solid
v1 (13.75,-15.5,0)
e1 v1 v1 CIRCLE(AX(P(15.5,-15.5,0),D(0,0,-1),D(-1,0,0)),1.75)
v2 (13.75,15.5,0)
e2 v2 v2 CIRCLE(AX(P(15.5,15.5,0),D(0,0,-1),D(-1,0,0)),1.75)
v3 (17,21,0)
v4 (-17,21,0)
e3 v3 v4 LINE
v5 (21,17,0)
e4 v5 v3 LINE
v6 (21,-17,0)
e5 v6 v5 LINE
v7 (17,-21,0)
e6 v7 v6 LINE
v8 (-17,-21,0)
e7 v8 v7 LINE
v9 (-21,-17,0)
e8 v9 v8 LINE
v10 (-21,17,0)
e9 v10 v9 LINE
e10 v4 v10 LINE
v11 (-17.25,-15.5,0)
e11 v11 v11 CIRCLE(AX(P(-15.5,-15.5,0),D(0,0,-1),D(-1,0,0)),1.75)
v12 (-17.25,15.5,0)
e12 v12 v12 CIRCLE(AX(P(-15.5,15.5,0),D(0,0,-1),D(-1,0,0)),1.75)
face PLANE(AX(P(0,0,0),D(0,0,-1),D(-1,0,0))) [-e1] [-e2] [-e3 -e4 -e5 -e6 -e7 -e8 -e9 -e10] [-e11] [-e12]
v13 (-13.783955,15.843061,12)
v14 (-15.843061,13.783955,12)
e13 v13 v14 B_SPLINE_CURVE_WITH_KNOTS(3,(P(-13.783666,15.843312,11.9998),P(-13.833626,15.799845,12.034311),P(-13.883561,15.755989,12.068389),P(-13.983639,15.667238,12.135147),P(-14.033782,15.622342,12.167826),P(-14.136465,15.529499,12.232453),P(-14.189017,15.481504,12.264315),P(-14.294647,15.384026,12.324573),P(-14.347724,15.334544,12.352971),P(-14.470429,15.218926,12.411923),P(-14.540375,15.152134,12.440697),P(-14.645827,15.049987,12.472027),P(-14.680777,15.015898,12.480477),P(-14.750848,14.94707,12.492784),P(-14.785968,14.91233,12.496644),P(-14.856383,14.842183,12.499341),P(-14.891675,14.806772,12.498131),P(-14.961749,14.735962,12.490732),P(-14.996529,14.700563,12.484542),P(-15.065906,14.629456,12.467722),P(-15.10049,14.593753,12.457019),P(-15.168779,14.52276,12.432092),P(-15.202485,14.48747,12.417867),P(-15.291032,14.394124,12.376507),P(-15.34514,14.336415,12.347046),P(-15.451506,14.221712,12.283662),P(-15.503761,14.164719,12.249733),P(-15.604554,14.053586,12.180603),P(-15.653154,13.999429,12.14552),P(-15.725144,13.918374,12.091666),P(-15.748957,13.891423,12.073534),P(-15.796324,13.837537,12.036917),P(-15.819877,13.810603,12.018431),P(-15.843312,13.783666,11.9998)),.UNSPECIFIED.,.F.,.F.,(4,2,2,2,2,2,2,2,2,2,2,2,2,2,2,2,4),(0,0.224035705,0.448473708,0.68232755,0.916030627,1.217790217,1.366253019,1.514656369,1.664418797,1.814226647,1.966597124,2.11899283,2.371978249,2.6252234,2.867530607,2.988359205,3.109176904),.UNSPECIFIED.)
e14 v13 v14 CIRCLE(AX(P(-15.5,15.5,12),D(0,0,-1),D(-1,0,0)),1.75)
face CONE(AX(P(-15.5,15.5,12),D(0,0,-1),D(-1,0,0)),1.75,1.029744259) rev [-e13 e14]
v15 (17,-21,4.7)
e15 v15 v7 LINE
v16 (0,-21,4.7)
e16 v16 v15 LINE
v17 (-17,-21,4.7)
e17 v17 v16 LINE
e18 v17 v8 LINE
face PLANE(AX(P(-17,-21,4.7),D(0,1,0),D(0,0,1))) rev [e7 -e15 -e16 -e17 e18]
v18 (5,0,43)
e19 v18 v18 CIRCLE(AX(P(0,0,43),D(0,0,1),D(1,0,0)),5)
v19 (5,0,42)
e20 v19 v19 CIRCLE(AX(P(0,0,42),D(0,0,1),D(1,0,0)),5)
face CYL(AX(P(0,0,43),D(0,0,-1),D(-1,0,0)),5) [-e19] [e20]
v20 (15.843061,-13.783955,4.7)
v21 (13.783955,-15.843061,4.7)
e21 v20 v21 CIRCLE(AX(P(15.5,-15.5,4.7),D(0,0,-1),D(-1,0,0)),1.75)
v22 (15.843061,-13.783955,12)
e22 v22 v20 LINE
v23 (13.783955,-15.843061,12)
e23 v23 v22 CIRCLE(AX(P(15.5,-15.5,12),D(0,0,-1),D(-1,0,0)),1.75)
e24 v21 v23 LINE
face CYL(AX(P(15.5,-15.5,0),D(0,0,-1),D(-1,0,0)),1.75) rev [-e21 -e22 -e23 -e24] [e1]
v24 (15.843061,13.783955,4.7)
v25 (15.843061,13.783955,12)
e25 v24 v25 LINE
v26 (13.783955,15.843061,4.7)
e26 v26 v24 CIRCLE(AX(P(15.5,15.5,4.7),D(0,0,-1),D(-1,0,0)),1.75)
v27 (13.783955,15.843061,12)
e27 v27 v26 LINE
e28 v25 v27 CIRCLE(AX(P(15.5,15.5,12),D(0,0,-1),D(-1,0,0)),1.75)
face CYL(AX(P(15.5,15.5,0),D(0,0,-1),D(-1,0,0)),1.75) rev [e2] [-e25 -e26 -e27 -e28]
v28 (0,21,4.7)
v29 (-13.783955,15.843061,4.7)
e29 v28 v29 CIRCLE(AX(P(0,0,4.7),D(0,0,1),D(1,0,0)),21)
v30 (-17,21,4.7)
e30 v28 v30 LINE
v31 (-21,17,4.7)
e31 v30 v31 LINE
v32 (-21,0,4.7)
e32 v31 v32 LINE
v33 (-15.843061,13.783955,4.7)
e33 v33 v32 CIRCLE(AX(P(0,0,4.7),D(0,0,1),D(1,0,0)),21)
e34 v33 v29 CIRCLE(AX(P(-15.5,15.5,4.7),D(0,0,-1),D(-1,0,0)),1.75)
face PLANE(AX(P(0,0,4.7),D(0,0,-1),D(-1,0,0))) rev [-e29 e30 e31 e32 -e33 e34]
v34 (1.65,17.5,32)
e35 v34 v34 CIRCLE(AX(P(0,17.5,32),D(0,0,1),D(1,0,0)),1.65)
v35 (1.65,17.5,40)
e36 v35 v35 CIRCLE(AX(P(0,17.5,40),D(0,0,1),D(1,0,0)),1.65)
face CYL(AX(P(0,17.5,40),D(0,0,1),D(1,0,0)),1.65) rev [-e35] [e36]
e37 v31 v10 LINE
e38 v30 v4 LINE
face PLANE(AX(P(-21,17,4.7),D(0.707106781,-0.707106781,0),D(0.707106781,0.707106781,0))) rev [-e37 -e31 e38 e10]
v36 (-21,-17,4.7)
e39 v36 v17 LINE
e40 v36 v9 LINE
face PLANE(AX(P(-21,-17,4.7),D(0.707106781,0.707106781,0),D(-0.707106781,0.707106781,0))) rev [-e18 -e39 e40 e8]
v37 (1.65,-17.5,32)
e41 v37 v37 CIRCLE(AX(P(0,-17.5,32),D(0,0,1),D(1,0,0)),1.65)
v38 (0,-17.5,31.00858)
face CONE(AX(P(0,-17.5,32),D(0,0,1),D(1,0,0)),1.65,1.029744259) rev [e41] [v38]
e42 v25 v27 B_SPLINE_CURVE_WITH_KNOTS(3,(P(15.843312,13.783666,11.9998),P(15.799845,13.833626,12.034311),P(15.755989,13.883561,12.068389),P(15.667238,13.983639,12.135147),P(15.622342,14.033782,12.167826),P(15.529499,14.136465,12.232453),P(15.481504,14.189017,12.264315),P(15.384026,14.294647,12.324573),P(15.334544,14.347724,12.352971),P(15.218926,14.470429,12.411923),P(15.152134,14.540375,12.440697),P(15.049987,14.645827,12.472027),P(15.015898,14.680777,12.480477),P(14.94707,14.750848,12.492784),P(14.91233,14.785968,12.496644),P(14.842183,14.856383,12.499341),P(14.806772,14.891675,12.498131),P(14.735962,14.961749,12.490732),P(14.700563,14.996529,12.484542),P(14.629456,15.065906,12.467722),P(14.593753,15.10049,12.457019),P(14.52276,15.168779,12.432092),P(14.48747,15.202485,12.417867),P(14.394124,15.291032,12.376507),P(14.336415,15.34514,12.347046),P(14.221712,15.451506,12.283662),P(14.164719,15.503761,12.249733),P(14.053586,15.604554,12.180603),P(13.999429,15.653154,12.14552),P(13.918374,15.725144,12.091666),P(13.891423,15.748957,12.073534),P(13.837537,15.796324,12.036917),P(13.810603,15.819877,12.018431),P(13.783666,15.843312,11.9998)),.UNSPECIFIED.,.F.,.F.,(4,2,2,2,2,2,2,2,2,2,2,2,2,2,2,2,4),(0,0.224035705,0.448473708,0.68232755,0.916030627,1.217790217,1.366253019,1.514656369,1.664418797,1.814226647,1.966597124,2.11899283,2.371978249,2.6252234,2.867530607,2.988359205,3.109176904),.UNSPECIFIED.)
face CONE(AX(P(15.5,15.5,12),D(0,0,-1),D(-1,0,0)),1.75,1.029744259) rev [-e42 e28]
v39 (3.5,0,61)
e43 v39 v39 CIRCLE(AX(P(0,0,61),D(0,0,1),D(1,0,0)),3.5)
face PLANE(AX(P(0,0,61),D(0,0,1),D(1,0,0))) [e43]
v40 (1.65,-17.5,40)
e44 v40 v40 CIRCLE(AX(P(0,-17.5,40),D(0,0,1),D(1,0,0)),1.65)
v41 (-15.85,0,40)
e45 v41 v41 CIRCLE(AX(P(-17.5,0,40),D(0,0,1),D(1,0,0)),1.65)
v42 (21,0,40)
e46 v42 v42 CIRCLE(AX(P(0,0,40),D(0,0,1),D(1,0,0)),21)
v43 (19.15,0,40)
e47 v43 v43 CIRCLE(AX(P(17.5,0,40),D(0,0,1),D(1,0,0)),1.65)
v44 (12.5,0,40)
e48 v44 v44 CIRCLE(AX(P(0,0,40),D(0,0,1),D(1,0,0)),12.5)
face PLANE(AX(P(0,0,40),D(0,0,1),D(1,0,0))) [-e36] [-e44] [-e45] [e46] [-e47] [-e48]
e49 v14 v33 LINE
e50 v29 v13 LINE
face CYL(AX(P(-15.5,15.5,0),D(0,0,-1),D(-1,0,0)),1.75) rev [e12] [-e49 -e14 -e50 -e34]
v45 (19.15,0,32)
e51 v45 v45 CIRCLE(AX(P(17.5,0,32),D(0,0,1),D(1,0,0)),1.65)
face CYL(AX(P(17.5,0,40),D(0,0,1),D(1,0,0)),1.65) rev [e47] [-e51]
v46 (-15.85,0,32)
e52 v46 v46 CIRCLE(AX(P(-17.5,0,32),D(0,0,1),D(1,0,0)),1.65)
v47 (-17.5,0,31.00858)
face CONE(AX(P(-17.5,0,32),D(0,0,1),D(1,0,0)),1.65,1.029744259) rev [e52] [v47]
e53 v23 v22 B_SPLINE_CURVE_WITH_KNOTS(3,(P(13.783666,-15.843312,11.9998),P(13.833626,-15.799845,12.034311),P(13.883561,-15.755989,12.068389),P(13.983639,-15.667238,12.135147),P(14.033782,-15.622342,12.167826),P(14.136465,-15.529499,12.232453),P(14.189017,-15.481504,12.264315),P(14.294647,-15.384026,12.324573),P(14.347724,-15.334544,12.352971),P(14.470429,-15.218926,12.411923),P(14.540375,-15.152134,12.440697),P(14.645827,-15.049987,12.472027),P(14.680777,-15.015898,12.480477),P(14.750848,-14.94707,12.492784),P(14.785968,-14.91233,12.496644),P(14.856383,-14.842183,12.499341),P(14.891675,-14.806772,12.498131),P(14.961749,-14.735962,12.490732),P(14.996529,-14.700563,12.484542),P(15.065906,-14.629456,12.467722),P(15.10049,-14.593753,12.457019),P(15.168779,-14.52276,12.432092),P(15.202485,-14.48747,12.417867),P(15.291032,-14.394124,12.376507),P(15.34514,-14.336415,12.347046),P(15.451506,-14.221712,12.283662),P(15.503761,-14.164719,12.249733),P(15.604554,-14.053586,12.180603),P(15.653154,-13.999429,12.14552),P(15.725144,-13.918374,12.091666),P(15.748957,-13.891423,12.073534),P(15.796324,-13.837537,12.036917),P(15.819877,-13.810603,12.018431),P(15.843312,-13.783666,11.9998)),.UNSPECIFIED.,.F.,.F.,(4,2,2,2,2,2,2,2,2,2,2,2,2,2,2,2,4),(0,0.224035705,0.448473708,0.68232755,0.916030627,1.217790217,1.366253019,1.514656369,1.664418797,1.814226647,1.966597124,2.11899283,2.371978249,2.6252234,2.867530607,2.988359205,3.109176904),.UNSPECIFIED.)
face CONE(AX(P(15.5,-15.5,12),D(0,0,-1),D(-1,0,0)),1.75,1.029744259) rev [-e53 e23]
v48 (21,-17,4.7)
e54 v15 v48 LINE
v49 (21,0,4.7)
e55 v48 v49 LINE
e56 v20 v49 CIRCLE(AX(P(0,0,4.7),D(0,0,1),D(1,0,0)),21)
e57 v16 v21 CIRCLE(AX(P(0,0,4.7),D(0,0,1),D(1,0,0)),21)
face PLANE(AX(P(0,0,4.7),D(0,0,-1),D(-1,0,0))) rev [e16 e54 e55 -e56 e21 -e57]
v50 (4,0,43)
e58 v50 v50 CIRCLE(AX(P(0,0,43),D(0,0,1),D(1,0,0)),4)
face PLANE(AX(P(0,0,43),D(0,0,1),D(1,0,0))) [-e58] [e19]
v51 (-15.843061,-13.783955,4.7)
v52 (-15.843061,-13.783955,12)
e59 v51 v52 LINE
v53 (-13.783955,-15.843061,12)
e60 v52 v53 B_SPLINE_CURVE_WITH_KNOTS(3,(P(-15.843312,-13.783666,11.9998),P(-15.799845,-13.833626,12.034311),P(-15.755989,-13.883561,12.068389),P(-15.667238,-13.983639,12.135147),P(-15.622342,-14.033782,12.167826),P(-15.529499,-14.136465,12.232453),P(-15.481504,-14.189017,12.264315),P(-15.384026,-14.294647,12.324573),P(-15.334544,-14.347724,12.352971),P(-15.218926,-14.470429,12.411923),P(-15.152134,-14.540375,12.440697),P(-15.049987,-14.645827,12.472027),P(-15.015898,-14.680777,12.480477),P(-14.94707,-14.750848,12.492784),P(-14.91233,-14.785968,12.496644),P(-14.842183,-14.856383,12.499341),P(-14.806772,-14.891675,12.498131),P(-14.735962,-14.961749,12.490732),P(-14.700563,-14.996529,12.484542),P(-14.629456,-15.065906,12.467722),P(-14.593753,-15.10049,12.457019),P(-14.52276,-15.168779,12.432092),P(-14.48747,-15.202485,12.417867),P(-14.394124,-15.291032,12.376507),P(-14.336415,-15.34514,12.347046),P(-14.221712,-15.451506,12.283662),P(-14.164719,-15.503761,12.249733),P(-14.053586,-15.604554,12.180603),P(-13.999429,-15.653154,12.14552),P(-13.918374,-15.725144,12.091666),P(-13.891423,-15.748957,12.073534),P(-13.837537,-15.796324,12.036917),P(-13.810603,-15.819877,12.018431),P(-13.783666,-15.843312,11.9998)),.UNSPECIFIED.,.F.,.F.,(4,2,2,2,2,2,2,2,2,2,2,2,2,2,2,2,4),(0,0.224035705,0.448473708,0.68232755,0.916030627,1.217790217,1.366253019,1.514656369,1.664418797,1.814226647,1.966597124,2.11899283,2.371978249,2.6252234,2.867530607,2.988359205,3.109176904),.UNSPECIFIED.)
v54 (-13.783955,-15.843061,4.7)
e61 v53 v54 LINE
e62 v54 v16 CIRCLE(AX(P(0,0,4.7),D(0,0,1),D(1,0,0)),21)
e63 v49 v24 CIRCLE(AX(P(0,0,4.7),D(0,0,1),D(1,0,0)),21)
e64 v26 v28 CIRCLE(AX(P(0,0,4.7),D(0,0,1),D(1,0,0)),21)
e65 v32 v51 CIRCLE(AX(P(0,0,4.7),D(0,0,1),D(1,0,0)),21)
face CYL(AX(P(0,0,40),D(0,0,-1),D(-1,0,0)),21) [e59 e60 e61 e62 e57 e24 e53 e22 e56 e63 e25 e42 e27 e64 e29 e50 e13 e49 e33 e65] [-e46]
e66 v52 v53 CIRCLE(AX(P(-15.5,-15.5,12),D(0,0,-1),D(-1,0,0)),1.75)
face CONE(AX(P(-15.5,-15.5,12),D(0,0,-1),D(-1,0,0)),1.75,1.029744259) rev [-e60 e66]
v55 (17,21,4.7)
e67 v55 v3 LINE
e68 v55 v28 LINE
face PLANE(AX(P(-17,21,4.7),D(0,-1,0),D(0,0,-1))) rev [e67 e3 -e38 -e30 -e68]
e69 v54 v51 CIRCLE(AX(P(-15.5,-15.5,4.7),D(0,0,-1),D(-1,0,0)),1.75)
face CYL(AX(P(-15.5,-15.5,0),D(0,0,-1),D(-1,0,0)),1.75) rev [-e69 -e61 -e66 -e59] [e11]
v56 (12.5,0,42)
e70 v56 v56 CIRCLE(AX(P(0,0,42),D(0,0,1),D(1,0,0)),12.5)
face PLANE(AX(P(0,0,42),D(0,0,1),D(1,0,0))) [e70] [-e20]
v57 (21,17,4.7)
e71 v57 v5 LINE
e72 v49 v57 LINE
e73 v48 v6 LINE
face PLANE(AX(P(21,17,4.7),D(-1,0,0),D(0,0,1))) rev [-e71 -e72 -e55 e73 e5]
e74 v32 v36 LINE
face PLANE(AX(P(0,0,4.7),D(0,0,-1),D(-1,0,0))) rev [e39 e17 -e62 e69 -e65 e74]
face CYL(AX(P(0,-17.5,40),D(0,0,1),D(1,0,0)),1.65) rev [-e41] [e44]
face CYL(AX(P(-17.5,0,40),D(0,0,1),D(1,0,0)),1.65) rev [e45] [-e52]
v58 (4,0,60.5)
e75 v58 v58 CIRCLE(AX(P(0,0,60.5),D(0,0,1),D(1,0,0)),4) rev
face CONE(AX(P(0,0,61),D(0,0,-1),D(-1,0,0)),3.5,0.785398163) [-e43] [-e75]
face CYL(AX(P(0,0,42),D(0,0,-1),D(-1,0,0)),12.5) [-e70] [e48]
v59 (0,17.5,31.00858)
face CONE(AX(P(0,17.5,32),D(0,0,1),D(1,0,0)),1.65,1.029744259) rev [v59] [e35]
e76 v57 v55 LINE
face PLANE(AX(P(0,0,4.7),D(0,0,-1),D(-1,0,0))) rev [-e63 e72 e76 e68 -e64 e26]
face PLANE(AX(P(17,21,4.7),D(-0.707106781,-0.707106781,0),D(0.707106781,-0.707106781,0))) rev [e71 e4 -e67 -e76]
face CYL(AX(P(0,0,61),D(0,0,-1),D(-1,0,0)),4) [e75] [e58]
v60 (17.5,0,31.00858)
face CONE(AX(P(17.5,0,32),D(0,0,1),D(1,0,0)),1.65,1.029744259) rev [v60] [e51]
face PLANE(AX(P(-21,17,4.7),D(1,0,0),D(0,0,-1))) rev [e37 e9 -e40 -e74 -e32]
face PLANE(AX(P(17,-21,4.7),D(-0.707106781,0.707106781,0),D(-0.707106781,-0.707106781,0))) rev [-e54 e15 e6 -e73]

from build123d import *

# Parameters (mm, degrees)
BOSS_EXTRUDE1_DEPTH = 4.7
SKETCH2_R           = 21
BOSS_EXTRUDE2_DEPTH = 35.3
SKETCH9_R           = 12.5
BOSS_EXTRUDE3_DEPTH = 2
SKETCH10_R          = 5
BOSS_EXTRUDE4_DEPTH = 1
SKETCH11_R          = 4
BOSS_EXTRUDE5_DEPTH = 18
CHAMFER1_SIZE       = 0.5


# Read off the part's stored shape, not the designer's step: Ø3.5 (3.5) Diameter Hole1, Tap Drill for M4x0.7 Tap1
with BuildPart() as part:
    # Sketch1 → Boss-Extrude1 (new body)
    with BuildSketch(Plane.XY):
        Polygon((-21, 17), (-17, 21), (17, 21), (21, 17), (21, -17), (17, -21), (-17, -21), (-21, -17), align=None)
    extrude(amount=BOSS_EXTRUDE1_DEPTH)

    # Sketch2 → Boss-Extrude2 (add)
    with BuildSketch(Plane.XY.offset(4.7)):
        Circle(SKETCH2_R)
    extrude(amount=BOSS_EXTRUDE2_DEPTH)

    # Ø3.5 (3.5) Diameter Hole1 outline → Ø3.5 (3.5) Diameter Hole1 (revolve, cut)
    with BuildSketch(Plane(origin=(-15.5, 15.5, 0), x_dir=(1, 0, 0), z_dir=(0, -1, 0))):
        Polygon((1.75, 0), (1.75, 12), (0.919892113, 12.498779139), (0, 12.498779139), (0, 0), align=None)
    revolve(axis=Axis((-15.5, 15.5, 0), (0, 0, 1)), mode=Mode.SUBTRACT)

    # 3.5 _3.5_ Diameter Hole1 2 outline → 3.5 _3.5_ Diameter Hole1 2 (revolve, cut)
    with BuildSketch(Plane(origin=(15.5, -15.5, 0), x_dir=(1, 0, 0), z_dir=(0, -1, 0))):
        Polygon((1.75, 0), (1.75, 12), (0.919892113, 12.498779139), (0, 12.498779139), (0, 0), align=None)
    revolve(axis=Axis((15.5, -15.5, 0), (0, 0, 1)), mode=Mode.SUBTRACT)

    # 3.5 _3.5_ Diameter Hole1 3 outline → 3.5 _3.5_ Diameter Hole1 3 (revolve, cut)
    with BuildSketch(Plane(origin=(15.5, 15.5, 0), x_dir=(1, 0, 0), z_dir=(0, -1, 0))):
        Polygon((1.75, 0), (1.75, 12), (0.919892113, 12.498779139), (0, 12.498779139), (0, 0), align=None)
    revolve(axis=Axis((15.5, 15.5, 0), (0, 0, 1)), mode=Mode.SUBTRACT)

    # 3.5 _3.5_ Diameter Hole1 4 outline → 3.5 _3.5_ Diameter Hole1 4 (revolve, cut)
    with BuildSketch(Plane(origin=(-15.5, -15.5, 0), x_dir=(1, 0, 0), z_dir=(0, -1, 0))):
        Polygon((1.75, 0), (1.75, 12), (0.919892113, 12.498779139), (0, 12.498779139), (0, 0), align=None)
    revolve(axis=Axis((-15.5, -15.5, 0), (0, 0, 1)), mode=Mode.SUBTRACT)

    # Tap Drill for M4x0.7 Tap1 outline → Tap Drill for M4x0.7 Tap1 (revolve, cut)
    with BuildSketch(Plane(origin=(17.5, 0, 0), x_dir=(1, 0, 0), z_dir=(0, -1, 0))):
        Polygon((0, 40), (0, 31.008579979), (1.65, 32), (1.65, 40), align=None)
    revolve(axis=Axis((17.5, 0, 0), (0, 0, 1)), mode=Mode.SUBTRACT)

    # Tap Drill for M4x0.7 Tap1 2 outline → Tap Drill for M4x0.7 Tap1 2 (revolve, cut)
    with BuildSketch(Plane(origin=(-17.5, 0, 0), x_dir=(1, 0, 0), z_dir=(0, -1, 0))):
        Polygon((0, 40), (0, 31.008579979), (1.65, 32), (1.65, 40), align=None)
    revolve(axis=Axis((-17.5, 0, 0), (0, 0, 1)), mode=Mode.SUBTRACT)

    # Tap Drill for M4x0.7 Tap1 3 outline → Tap Drill for M4x0.7 Tap1 3 (revolve, cut)
    with BuildSketch(Plane.XZ.offset(17.5)):
        Polygon((0, 40), (0, 31.008579979), (1.65, 32), (1.65, 40), align=None)
    revolve(axis=Axis((0, -17.5, 0), (0, 0, 1)), mode=Mode.SUBTRACT)

    # Tap Drill for M4x0.7 Tap1 4 outline → Tap Drill for M4x0.7 Tap1 4 (revolve, cut)
    with BuildSketch(Plane.XZ.offset(-17.5)):
        Polygon((0, 40), (0, 31.008579979), (1.65, 32), (1.65, 40), align=None)
    revolve(axis=Axis((0, 17.5, 0), (0, 0, 1)), mode=Mode.SUBTRACT)

    # Sketch9 → Boss-Extrude3 (add)
    with BuildSketch(Plane.XY.offset(40)):
        Circle(SKETCH9_R)
    extrude(amount=BOSS_EXTRUDE3_DEPTH)

    # Sketch10 → Boss-Extrude4 (add)
    with BuildSketch(Plane.XY.offset(42)):
        Circle(SKETCH10_R)
    extrude(amount=BOSS_EXTRUDE4_DEPTH)

    # Sketch11 → Boss-Extrude5 (add)
    with BuildSketch(Plane.XY.offset(43)):
        Circle(SKETCH11_R)
    extrude(amount=BOSS_EXTRUDE5_DEPTH)

    # Chamfer1
    chamfer1_edges = [part.edges().sort_by_distance(p)[0] for p in [
        (-4, 0, 61),
    ]]
    chamfer(chamfer1_edges, length=CHAMFER1_SIZE)


solid = part.part
